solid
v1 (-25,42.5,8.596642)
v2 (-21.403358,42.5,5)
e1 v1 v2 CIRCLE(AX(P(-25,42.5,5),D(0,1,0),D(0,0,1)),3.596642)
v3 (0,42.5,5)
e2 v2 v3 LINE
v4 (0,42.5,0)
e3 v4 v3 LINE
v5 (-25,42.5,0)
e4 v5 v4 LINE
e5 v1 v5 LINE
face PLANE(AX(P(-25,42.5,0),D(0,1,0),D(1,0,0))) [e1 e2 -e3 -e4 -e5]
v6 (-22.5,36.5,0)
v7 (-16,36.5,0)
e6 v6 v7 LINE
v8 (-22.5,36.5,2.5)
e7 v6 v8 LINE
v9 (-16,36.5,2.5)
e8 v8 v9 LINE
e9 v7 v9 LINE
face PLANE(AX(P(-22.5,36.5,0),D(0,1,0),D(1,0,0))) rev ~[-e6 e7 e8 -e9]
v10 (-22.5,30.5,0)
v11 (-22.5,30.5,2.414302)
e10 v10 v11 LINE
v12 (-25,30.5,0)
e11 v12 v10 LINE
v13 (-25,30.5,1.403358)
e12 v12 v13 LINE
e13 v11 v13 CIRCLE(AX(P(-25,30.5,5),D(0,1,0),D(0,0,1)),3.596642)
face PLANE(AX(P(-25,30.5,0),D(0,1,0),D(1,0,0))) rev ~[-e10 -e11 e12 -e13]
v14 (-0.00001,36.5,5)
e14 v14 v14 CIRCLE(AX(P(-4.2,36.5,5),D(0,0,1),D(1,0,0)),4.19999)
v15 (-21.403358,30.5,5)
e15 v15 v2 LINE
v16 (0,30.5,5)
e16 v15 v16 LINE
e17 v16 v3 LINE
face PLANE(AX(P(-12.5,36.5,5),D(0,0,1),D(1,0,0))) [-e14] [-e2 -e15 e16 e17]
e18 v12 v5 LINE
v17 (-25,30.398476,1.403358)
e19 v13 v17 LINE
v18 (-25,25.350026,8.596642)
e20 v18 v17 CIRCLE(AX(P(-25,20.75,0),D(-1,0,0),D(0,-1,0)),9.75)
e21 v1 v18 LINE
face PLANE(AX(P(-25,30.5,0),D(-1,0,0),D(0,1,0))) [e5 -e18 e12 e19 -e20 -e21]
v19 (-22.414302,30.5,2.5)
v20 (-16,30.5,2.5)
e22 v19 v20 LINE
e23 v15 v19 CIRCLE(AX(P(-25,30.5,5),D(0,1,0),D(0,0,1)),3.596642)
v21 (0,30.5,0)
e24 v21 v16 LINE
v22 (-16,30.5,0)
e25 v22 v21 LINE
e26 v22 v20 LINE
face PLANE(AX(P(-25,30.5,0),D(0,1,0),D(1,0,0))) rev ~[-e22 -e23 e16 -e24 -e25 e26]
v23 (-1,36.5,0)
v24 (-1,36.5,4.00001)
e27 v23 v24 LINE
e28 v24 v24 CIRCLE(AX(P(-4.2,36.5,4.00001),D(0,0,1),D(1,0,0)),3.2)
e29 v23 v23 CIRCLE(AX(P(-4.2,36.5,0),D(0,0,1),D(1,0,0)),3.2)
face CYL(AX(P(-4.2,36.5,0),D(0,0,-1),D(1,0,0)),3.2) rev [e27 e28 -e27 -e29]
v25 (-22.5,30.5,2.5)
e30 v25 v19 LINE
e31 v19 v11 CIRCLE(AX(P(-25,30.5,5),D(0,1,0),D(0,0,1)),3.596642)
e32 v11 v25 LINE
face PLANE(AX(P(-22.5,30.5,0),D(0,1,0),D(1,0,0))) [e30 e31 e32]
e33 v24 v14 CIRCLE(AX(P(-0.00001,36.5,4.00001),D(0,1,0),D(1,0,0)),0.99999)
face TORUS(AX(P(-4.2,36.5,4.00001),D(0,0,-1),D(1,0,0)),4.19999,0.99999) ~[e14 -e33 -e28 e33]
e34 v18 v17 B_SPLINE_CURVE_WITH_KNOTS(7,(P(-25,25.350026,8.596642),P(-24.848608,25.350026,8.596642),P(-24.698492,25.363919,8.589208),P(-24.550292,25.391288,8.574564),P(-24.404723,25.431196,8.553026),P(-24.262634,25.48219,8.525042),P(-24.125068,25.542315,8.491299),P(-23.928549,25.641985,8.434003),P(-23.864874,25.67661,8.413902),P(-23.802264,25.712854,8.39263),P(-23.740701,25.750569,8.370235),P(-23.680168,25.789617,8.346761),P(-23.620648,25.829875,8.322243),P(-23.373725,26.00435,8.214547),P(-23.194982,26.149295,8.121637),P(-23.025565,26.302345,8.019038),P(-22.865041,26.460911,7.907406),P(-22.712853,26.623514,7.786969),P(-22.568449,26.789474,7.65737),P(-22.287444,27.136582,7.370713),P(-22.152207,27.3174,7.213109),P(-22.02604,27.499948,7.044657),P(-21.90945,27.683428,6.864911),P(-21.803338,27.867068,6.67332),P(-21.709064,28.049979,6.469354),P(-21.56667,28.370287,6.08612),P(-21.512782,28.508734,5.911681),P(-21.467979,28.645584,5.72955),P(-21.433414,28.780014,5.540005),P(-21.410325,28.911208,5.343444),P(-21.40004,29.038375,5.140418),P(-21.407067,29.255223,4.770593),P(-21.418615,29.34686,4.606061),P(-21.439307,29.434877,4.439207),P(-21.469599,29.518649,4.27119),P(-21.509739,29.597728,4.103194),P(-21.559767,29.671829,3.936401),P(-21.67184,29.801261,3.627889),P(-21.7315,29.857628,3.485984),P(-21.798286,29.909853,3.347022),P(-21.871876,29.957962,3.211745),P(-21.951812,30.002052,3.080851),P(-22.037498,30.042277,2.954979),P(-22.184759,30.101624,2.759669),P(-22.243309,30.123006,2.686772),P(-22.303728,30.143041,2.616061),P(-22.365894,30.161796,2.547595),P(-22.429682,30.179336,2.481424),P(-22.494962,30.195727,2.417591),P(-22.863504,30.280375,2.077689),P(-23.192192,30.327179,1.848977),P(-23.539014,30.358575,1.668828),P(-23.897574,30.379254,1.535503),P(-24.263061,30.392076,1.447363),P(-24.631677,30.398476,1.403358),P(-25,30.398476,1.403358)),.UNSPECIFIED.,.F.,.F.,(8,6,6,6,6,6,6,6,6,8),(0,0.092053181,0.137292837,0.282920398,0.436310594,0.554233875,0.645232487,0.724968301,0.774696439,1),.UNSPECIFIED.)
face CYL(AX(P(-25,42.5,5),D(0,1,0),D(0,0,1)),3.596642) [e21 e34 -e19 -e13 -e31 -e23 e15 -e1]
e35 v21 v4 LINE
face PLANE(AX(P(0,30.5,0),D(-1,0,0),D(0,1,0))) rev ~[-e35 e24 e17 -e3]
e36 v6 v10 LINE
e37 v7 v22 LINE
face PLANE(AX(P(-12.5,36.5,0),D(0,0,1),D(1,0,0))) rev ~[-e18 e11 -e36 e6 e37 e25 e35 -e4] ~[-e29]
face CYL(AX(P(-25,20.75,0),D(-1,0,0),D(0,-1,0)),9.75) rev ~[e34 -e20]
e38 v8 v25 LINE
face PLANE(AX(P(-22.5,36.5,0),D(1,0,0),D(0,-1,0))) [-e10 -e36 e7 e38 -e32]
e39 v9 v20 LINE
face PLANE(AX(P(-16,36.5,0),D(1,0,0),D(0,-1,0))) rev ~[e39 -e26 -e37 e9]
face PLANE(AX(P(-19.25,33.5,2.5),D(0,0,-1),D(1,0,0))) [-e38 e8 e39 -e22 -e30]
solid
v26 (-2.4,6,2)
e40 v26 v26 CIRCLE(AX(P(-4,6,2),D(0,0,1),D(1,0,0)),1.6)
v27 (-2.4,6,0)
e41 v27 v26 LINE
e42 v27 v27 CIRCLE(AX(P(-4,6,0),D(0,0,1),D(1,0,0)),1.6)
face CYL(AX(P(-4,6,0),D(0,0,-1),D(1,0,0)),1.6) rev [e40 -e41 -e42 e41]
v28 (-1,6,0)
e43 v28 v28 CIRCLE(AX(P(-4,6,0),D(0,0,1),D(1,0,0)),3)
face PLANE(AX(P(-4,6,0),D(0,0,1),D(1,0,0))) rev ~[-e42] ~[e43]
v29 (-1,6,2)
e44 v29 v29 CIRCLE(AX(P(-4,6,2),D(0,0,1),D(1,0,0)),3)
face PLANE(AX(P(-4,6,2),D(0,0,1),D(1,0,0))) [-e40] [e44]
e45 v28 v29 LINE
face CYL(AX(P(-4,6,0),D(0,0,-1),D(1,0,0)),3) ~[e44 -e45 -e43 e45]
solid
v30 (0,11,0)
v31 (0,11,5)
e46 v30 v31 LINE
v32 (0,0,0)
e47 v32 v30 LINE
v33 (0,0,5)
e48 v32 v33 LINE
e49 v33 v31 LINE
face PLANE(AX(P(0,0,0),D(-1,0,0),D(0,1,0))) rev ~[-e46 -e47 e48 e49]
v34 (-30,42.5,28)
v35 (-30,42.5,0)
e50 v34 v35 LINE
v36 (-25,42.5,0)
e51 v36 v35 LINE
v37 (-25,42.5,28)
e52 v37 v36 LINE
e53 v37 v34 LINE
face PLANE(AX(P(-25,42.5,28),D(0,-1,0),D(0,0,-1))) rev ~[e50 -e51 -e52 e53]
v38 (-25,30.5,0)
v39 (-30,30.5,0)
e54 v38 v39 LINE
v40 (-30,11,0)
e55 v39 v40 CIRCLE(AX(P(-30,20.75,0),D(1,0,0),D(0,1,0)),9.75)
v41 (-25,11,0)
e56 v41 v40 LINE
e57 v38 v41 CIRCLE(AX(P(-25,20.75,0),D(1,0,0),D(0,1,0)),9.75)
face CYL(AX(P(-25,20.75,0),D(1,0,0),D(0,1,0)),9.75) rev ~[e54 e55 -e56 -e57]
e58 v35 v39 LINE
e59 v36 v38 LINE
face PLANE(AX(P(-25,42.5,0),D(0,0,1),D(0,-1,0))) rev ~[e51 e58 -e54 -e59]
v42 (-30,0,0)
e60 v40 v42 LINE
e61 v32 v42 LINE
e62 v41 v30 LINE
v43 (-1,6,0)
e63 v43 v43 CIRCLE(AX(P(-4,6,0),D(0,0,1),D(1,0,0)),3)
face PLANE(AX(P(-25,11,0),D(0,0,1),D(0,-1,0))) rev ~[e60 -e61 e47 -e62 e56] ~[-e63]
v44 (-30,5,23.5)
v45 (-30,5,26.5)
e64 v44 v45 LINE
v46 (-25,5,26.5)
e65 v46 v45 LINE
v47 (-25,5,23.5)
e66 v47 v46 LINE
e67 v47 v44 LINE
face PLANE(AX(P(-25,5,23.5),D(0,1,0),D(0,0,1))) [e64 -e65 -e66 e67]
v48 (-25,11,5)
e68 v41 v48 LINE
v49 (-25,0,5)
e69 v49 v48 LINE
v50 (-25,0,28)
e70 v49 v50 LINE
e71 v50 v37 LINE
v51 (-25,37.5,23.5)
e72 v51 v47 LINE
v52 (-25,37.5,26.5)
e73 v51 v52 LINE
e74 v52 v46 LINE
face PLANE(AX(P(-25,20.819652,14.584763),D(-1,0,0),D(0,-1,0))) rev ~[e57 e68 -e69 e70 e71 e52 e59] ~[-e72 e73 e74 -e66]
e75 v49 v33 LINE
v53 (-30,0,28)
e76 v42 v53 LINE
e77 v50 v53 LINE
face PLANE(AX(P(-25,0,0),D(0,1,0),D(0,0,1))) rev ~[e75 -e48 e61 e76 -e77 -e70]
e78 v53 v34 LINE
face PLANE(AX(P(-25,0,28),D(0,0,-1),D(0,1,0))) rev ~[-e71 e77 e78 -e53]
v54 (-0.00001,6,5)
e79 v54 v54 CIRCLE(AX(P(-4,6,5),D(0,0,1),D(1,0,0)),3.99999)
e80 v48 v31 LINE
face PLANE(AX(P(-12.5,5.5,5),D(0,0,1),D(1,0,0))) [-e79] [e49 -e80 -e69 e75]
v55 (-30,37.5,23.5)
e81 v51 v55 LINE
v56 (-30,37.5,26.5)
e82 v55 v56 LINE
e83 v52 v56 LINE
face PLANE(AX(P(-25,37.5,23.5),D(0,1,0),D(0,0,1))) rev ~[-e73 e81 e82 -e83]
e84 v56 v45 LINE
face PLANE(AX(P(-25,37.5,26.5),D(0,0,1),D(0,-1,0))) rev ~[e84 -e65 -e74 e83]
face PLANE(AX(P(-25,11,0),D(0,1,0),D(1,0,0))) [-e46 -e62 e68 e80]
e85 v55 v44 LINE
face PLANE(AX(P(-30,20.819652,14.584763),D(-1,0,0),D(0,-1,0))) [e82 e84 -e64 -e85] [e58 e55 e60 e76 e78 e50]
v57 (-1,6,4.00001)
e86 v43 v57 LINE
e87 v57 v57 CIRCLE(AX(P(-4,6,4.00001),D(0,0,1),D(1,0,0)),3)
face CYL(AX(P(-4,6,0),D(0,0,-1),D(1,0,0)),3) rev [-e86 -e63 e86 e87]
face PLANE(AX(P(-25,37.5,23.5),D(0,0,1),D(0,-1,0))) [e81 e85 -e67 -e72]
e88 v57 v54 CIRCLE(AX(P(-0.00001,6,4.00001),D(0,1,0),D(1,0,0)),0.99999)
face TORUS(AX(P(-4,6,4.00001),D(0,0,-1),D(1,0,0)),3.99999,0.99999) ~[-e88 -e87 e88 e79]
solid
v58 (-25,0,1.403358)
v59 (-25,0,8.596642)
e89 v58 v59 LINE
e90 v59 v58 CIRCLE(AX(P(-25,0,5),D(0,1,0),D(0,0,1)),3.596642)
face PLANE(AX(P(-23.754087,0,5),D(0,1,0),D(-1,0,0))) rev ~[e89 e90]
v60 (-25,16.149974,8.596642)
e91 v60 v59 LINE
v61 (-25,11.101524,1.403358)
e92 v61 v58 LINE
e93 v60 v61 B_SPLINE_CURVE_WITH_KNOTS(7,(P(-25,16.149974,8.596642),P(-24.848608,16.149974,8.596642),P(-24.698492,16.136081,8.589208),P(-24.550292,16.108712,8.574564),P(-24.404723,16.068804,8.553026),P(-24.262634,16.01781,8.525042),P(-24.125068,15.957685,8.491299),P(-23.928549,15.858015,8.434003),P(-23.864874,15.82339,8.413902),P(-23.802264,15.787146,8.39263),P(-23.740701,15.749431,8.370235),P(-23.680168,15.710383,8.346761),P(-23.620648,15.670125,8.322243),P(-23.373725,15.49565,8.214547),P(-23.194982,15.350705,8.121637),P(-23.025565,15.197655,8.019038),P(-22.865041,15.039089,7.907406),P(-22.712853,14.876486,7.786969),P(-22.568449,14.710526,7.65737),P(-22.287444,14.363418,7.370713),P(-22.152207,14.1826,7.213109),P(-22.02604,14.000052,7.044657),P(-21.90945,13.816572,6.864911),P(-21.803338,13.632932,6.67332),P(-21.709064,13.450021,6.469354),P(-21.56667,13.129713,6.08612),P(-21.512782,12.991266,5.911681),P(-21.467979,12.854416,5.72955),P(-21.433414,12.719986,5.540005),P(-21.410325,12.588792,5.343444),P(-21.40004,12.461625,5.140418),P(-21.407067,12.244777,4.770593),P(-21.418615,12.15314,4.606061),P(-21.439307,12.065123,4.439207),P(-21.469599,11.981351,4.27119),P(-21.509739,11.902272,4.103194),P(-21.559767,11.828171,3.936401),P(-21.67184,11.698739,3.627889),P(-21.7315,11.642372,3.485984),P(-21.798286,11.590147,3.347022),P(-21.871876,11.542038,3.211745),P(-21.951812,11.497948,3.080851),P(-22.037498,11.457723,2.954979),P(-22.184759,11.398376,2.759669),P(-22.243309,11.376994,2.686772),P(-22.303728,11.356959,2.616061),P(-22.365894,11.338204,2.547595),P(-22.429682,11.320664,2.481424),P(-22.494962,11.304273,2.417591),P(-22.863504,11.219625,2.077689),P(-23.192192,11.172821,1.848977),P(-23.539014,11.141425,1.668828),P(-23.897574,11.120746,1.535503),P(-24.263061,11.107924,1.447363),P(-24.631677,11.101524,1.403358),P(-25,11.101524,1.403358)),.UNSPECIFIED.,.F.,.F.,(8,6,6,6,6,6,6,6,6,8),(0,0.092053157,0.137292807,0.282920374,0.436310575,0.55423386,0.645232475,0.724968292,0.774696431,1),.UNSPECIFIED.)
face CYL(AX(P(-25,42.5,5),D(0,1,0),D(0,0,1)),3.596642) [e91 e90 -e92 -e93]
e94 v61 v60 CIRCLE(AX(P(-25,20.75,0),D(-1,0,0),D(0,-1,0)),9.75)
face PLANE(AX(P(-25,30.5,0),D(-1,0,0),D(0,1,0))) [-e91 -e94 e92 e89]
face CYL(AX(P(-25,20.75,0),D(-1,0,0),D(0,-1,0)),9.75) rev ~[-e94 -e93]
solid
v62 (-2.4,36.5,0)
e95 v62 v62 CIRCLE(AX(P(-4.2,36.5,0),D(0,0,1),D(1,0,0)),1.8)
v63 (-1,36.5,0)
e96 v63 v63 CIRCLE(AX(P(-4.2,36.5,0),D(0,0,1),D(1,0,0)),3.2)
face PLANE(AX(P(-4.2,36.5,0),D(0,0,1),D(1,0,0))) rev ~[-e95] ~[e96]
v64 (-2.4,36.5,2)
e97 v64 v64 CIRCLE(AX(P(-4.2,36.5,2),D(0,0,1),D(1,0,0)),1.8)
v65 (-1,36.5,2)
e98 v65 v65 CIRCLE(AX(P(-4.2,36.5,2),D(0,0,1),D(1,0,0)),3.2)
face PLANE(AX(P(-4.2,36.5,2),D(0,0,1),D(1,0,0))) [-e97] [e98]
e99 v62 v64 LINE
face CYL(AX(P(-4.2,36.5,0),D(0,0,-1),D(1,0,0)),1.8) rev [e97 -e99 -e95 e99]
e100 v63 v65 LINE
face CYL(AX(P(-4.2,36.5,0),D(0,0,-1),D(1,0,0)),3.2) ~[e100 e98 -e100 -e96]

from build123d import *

# Parameters (mm, degrees)
F0_W     = 25
F0_H     = 12
F0_R     = 3.2
F1_DEPTH = 5
F0_H_2   = 11
F0_R_2   = 3
F2_W     = 32.5
F2_H     = 3
F2_W_2   = 12
F2_H_2   = 5
F3_DEPTH = 5
F5_DEPTH = 42.5
F6_W     = 6.5
F6_H     = 6
F7_DEPTH = 2.5
F8_DEPTH = 25
F0_R_3   = 1.6
F9_DEPTH = 2
F0_R_4   = 1.8
F10_R    = 0.99999
F10_2_R  = 0.99999


# Not quite as in the source:
# - a fillet or chamfer is up to 0.001 mm smaller than in the source, because OpenCascade refuses the exact size


with BuildPart() as f1:
    # F0 (on Top) → F1 (new body)
    with BuildSketch(Plane.XY):
        with Locations((-12.5, 36.5)):
            Rectangle(F0_W, F0_H)
        with Locations((-4.2, 36.5)):
            Circle(F0_R, mode=Mode.SUBTRACT)
    extrude(amount=F1_DEPTH)

    # F4 (on face) → F5 (join, through all)
    with BuildSketch(Plane(origin=(0, 42.5, 0), x_dir=(-1, 0, 0), z_dir=(0, 1, 0))):
        with BuildLine():
            Line((25, 1.4033576227), (25, 8.5966423773))
            ThreePointArc((25, 8.5966423773), (21.4033576227, 5), (25, 1.4033576227))
        make_face()
    extrude(amount=-F5_DEPTH)

    # F6 (on face) → F7 (cut)
    with BuildSketch(Plane(origin=(0, 0, 0), x_dir=(1, 0, 0), z_dir=(0, 0, -1))):
        with Locations((-19.25, -33.5)):
            Rectangle(F6_W, F6_H)
    extrude(amount=-F7_DEPTH, mode=Mode.SUBTRACT)

    # F2 (on face) → F8 (cut)
    with BuildSketch(Plane(origin=(-25, 0, 0), x_dir=(0, -1, 0), z_dir=(-1, 0, 0))):
        with BuildLine():
            Line((-30.5, 0), (-11, 0))
            ThreePointArc((-11, 0), (-20.75, 9.75), (-30.5, 0))
        make_face()
    extrude(amount=-F8_DEPTH, mode=Mode.SUBTRACT)

    # F10 (radius 1 in the source; OpenCascade refuses exactly that, so slightly less here)
    f10_edges = [f1.edges().sort_by_distance(p)[0] for p in [
        (-7.4, 36.5, 5),
    ]]
    fillet(f10_edges, radius=F10_R)


with BuildPart() as f1b:
    # F0 (on Top) → F1, piece 2 (new body)
    with BuildSketch(Plane.XY):
        with Locations((-12.5, 5.5)):
            Rectangle(F0_W, F0_H_2)
        with Locations((-4, 6)):
            Circle(F0_R_2, mode=Mode.SUBTRACT)
    extrude(amount=F1_DEPTH)

    # F2 (on face) → F3 (join)
    with BuildSketch(Plane(origin=(-25, 0, 0), x_dir=(0, -1, 0), z_dir=(-1, 0, 0))):
        with BuildLine():
            Line((-11, 0), (0, 0))
            Line((0, 0), (0, 28))
            Line((0, 28), (-42.5, 28))
            Line((-42.5, 28), (-42.5, 5))
            Line((-42.5, 5), (-30.5, 5))
            Line((-30.5, 5), (-30.5, 0))
            ThreePointArc((-30.5, 0), (-20.75, 9.75), (-11, 0))
        make_face()
        with Locations((-21.25, 25)):
            Rectangle(F2_W, F2_H, mode=Mode.SUBTRACT)
        with Locations((-36.5, 2.5)):
            Rectangle(F2_W_2, F2_H_2)
    extrude(amount=F3_DEPTH)

    # F10#2 (radius 1 in the source; OpenCascade refuses exactly that, so slightly less here)
    f10_2_edges = [f1b.edges().sort_by_distance(p)[0] for p in [
        (-7, 6, 5),
    ]]
    fillet(f10_2_edges, radius=F10_2_R)


with BuildPart() as f9:
    # F0 (on Top) → F9 (new body)
    with BuildSketch(Plane.XY):
        with Locations((-4, 6)):
            Circle(F0_R_2)
        with Locations((-4, 6)):
            Circle(F0_R_3, mode=Mode.SUBTRACT)
    extrude(amount=F9_DEPTH)


with BuildPart() as f9b:
    # F0 (on Top) → F9, piece 2 (new body)
    with BuildSketch(Plane.XY):
        with Locations((-4.2, 36.5)):
            Circle(F0_R)
        with Locations((-4.2, 36.5)):
            Circle(F0_R_4, mode=Mode.SUBTRACT)
    extrude(amount=F9_DEPTH)


solid = Compound([f1.part, f1b.part, f9.part, f9b.part])
